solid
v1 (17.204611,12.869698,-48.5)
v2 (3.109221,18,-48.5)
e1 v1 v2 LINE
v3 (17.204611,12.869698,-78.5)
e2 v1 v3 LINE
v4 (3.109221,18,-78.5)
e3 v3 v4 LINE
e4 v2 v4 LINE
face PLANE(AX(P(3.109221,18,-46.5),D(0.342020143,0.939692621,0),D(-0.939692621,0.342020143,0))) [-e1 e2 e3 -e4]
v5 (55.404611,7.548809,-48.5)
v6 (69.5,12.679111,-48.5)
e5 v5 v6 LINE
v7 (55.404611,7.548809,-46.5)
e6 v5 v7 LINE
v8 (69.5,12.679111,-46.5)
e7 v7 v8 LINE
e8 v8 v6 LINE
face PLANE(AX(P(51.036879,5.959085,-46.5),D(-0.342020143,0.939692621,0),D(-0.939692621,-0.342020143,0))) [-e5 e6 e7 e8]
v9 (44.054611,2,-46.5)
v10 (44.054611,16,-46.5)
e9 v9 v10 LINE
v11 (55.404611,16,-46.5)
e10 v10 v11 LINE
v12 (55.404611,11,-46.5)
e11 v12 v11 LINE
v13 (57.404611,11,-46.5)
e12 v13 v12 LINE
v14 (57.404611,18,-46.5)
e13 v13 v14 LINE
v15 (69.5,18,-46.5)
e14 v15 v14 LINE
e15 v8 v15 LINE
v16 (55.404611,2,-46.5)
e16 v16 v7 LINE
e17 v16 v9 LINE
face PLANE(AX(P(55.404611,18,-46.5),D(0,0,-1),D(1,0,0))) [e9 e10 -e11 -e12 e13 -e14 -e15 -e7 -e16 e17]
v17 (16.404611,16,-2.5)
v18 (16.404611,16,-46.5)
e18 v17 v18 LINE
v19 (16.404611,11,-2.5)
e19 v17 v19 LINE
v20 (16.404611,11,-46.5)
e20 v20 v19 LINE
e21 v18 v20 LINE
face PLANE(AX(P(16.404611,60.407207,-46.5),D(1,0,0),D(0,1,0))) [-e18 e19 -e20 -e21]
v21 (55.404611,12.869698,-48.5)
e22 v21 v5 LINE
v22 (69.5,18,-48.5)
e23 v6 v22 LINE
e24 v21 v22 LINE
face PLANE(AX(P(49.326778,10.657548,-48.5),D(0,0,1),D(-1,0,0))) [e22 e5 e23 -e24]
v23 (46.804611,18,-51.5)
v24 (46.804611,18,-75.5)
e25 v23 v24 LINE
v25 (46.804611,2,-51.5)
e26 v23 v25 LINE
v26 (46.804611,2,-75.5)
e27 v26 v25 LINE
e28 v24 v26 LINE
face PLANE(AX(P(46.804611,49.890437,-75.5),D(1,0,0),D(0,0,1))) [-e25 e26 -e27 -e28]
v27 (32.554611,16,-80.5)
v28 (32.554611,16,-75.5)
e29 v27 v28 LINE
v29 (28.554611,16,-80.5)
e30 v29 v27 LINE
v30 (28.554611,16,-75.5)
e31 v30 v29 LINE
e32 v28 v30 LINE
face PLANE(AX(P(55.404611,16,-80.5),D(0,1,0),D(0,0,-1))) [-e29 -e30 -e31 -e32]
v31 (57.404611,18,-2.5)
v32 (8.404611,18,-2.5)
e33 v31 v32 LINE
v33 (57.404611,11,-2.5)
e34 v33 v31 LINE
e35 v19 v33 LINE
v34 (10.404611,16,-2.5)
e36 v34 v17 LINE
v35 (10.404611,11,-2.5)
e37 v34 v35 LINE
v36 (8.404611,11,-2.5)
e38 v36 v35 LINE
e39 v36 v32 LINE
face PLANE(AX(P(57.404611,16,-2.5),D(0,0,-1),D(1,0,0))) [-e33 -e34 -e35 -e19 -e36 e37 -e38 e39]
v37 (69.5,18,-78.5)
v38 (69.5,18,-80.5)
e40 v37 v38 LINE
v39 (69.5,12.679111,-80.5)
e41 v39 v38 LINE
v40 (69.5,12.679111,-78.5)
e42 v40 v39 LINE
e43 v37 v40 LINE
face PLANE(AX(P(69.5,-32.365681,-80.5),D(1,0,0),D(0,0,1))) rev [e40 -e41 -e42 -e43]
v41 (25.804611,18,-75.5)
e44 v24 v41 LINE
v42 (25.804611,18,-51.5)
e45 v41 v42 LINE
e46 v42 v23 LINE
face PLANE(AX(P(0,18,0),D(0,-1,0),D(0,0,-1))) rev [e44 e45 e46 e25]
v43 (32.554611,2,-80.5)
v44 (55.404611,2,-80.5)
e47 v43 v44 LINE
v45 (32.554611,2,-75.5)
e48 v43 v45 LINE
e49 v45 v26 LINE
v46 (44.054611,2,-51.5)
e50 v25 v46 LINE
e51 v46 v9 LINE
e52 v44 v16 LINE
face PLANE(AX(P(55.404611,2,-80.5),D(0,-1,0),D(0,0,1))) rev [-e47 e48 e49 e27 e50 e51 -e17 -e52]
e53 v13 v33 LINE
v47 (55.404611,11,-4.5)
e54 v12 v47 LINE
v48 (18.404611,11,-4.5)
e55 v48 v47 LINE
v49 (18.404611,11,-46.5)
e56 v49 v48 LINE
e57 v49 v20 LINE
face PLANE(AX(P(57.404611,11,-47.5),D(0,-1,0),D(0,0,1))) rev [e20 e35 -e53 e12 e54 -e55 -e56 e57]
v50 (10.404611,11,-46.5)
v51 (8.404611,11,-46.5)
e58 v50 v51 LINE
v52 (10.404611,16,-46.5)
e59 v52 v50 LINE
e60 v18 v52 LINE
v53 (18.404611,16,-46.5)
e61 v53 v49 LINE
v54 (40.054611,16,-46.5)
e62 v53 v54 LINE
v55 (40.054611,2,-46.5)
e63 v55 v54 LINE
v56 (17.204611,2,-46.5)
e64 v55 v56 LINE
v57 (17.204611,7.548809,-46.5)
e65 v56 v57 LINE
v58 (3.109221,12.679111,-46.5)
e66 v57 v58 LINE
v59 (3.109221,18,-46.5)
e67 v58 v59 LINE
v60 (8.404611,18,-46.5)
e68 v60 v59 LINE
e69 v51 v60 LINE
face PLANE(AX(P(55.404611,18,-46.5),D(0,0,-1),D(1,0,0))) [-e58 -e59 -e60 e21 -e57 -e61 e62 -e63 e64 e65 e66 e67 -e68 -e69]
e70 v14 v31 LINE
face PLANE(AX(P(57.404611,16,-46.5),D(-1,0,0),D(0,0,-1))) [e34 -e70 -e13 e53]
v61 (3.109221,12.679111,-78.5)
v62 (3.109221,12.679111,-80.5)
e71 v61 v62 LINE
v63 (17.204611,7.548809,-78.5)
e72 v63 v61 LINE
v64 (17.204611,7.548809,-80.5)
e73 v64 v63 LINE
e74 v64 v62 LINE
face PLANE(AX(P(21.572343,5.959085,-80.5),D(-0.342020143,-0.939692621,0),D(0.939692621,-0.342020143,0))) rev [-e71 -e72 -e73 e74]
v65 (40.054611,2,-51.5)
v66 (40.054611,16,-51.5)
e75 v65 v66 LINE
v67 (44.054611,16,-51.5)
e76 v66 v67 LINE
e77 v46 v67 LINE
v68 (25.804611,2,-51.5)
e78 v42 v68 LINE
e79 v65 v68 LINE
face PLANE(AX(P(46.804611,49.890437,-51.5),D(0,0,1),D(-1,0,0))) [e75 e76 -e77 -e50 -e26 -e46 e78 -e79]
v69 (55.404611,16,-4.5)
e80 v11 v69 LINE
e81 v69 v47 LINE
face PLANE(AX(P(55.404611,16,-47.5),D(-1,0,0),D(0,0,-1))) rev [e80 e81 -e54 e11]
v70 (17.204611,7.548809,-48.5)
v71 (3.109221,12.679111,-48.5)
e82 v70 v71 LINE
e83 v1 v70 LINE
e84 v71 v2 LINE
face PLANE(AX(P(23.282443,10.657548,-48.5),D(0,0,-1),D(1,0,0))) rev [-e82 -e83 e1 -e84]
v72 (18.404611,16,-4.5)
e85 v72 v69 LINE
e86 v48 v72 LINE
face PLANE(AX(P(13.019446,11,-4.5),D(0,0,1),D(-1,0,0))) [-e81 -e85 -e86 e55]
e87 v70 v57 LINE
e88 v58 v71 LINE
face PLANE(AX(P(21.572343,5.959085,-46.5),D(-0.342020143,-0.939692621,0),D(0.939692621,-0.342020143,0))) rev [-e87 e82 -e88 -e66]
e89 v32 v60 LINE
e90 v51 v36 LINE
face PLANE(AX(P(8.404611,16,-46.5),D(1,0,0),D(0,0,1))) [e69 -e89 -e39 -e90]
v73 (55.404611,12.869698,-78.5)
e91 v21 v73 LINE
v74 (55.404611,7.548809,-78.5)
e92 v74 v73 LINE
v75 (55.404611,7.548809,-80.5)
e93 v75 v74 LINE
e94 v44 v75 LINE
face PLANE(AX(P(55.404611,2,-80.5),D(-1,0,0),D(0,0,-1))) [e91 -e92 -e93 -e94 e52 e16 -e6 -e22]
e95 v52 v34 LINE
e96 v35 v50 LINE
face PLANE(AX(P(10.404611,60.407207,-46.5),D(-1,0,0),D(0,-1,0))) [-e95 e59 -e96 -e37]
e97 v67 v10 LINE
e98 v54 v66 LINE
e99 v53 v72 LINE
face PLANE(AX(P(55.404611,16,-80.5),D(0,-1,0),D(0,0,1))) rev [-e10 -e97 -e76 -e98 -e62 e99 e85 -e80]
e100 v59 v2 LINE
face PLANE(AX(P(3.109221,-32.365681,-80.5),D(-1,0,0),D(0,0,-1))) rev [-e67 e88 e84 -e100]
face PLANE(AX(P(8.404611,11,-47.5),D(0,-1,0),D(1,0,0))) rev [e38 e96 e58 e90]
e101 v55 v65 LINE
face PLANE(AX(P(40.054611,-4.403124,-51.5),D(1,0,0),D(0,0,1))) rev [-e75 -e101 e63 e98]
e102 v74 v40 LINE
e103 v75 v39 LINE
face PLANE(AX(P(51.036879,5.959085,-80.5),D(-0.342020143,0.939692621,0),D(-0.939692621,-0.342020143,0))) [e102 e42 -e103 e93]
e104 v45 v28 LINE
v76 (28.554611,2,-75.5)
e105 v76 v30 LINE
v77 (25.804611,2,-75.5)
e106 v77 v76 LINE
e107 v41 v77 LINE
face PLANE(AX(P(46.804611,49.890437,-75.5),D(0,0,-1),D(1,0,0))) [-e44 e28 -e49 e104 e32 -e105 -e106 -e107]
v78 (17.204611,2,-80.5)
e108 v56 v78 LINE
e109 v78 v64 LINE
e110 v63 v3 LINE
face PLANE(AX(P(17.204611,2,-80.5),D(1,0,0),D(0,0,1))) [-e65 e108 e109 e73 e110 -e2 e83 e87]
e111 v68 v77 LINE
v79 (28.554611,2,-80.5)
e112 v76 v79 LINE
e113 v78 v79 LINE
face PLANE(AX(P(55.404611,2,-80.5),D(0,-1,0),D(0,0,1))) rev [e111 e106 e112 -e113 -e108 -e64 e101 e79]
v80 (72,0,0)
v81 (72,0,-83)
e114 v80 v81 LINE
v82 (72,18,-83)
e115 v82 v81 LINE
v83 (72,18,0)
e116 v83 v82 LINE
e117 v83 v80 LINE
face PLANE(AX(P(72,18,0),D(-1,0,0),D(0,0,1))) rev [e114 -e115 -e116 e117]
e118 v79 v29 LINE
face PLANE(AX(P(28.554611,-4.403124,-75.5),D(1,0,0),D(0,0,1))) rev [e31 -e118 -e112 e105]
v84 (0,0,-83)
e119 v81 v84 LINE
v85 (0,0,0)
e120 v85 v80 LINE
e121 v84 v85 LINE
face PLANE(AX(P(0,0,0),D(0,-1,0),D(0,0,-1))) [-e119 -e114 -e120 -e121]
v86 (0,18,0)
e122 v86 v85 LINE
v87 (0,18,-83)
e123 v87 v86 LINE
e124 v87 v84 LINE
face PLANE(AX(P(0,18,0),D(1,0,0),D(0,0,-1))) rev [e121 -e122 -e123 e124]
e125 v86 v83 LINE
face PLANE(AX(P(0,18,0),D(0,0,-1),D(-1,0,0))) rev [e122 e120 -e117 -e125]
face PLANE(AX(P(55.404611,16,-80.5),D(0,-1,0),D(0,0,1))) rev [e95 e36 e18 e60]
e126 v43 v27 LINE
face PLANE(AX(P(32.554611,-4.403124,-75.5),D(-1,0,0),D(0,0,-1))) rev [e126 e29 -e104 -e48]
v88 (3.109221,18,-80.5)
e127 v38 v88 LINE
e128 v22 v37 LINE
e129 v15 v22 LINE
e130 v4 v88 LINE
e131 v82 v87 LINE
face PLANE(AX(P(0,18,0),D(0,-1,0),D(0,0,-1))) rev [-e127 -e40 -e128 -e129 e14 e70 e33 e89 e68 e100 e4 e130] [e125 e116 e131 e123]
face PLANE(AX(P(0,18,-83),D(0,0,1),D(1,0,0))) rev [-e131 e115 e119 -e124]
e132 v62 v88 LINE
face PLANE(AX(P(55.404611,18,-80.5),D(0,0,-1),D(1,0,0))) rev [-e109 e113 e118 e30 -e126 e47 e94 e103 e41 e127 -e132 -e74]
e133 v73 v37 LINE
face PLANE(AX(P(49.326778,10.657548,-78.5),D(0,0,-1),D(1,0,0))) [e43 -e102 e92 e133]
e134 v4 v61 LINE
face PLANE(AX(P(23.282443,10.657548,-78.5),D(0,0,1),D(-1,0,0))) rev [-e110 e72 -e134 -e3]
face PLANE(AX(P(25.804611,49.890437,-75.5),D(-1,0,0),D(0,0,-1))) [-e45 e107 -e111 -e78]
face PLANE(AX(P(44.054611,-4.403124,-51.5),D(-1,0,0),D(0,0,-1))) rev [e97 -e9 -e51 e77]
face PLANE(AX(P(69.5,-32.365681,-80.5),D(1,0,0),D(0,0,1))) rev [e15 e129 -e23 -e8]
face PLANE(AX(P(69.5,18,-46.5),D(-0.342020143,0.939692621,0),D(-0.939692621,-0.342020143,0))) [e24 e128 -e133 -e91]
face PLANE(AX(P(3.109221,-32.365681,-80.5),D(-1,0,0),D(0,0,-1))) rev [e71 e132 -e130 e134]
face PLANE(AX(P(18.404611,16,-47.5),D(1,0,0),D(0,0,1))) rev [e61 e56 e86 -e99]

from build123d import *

# Parameters (mm, degrees)
SKETCH1_W           = 72
SKETCH1_H           = 83
BOSS_EXTRUDE1_DEPTH = 18
CAVITY2_START       = -80.5
CAVITY2_DEPTH       = 34
CAVITY2_START_2     = -48.5
CAVITY2_2_DEPTH     = 46
CAVITY2_3_DEPTH     = 5
CAVITY2_START_3     = -51.5
CAVITY2_4_DEPTH     = 5
CAVITY2_START_4     = -4.5
CAVITY2_5_OUTLINE_W = 37
CAVITY2_5_OUTLINE_H = 5
CAVITY2_5_DEPTH     = 2
CAVITY2_6_DEPTH     = 2
CAVITY2_7_DEPTH     = 2


# Read off the part's stored shape, not the designer's step: Cavity2
with BuildPart() as part:
    # Sketch1 → Boss-Extrude1 (new body)
    with BuildSketch(Plane(origin=(0, 0, 0), x_dir=(1, 0, 0), z_dir=(0, 1, 0))):
        with Locations((36, 41.5)):
            Rectangle(SKETCH1_W, SKETCH1_H)
    extrude(amount=BOSS_EXTRUDE1_DEPTH)

    # Cavity2 outline → Cavity2 (cut)
    with BuildSketch(Plane.XY.offset(CAVITY2_START)):
        Polygon((55.404610688, 2), (55.404610688, 12.86969785), (69.5, 18), (46.804610688, 18), (46.804610688, 2), align=None)
        Polygon((25.804610688, 18), (3.109221376, 18), (17.204610688, 12.86969785), (17.204610688, 2), (25.804610688, 2), align=None)
    extrude(amount=CAVITY2_DEPTH, mode=Mode.SUBTRACT)

    # Cavity2 2 outline → Cavity2 2 (cut)
    with BuildSketch(Plane.XY.offset(CAVITY2_START_2)):
        Polygon((55.404610688, 11), (57.404610688, 11), (57.404610688, 18), (8.404610688, 18), (8.404610688, 11), (10.404610688, 11), (10.404610688, 16), (16.404610688, 16), (16.404610688, 11), (18.404610688, 11), (18.404610688, 16), (55.404610688, 16), align=None)
    extrude(amount=CAVITY2_2_DEPTH, mode=Mode.SUBTRACT)

    # Cavity2 3 outline → Cavity2 3 (cut)
    with BuildSketch(Plane.XY.offset(CAVITY2_START)):
        Polygon((46.804610688, 2), (46.804610688, 18), (25.804610688, 18), (25.804610688, 2), (28.554610688, 2), (28.554610688, 16), (32.554610688, 16), (32.554610688, 2), align=None)
    extrude(amount=CAVITY2_3_DEPTH, mode=Mode.SUBTRACT)

    # Cavity2 4 outline → Cavity2 4 (cut)
    with BuildSketch(Plane.XY.offset(CAVITY2_START_3)):
        Polygon((46.804610688, 2), (46.804610688, 18), (25.804610688, 18), (25.804610688, 2), (40.054610688, 2), (40.054610688, 16), (44.054610688, 16), (44.054610688, 2), align=None)
    extrude(amount=CAVITY2_4_DEPTH, mode=Mode.SUBTRACT)

    # Cavity2 5 outline → Cavity2 5 (cut)
    with BuildSketch(Plane.XY.offset(CAVITY2_START_4)):
        with Locations((36.904610688, 13.5)):
            Rectangle(CAVITY2_5_OUTLINE_W, CAVITY2_5_OUTLINE_H)
    extrude(amount=CAVITY2_5_DEPTH, mode=Mode.SUBTRACT)

    # Cavity2 6 outline → Cavity2 6 (cut)
    with BuildSketch(Plane.XY.offset(CAVITY2_START)):
        Polygon((55.404610688, 7.548808988), (69.5, 12.679111138), (69.5, 18), (55.404610688, 12.86969785), align=None)
        Polygon((3.109221376, 18), (3.109221376, 12.679111138), (17.204610688, 7.548808988), (17.204610688, 12.86969785), align=None)
    extrude(amount=CAVITY2_6_DEPTH, mode=Mode.SUBTRACT)

    # Cavity2 7 outline → Cavity2 7 (cut)
    with BuildSketch(Plane.XY.offset(CAVITY2_START_2)):
        Polygon((55.404610688, 7.548808988), (69.5, 12.679111138), (69.5, 18), (57.404610688, 13.597638319), (57.404610688, 11), (55.404610688, 11), align=None)
        Polygon((8.404610688, 11), (8.404610688, 16.072635912), (3.109221376, 18), (3.109221376, 12.679111138), (17.204610688, 7.548808988), (17.204610688, 11), (16.404610688, 11), (16.404610688, 13.160874037), (10.404610688, 15.344695443), (10.404610688, 11), align=None)
    extrude(amount=CAVITY2_7_DEPTH, mode=Mode.SUBTRACT)


solid = part.part
